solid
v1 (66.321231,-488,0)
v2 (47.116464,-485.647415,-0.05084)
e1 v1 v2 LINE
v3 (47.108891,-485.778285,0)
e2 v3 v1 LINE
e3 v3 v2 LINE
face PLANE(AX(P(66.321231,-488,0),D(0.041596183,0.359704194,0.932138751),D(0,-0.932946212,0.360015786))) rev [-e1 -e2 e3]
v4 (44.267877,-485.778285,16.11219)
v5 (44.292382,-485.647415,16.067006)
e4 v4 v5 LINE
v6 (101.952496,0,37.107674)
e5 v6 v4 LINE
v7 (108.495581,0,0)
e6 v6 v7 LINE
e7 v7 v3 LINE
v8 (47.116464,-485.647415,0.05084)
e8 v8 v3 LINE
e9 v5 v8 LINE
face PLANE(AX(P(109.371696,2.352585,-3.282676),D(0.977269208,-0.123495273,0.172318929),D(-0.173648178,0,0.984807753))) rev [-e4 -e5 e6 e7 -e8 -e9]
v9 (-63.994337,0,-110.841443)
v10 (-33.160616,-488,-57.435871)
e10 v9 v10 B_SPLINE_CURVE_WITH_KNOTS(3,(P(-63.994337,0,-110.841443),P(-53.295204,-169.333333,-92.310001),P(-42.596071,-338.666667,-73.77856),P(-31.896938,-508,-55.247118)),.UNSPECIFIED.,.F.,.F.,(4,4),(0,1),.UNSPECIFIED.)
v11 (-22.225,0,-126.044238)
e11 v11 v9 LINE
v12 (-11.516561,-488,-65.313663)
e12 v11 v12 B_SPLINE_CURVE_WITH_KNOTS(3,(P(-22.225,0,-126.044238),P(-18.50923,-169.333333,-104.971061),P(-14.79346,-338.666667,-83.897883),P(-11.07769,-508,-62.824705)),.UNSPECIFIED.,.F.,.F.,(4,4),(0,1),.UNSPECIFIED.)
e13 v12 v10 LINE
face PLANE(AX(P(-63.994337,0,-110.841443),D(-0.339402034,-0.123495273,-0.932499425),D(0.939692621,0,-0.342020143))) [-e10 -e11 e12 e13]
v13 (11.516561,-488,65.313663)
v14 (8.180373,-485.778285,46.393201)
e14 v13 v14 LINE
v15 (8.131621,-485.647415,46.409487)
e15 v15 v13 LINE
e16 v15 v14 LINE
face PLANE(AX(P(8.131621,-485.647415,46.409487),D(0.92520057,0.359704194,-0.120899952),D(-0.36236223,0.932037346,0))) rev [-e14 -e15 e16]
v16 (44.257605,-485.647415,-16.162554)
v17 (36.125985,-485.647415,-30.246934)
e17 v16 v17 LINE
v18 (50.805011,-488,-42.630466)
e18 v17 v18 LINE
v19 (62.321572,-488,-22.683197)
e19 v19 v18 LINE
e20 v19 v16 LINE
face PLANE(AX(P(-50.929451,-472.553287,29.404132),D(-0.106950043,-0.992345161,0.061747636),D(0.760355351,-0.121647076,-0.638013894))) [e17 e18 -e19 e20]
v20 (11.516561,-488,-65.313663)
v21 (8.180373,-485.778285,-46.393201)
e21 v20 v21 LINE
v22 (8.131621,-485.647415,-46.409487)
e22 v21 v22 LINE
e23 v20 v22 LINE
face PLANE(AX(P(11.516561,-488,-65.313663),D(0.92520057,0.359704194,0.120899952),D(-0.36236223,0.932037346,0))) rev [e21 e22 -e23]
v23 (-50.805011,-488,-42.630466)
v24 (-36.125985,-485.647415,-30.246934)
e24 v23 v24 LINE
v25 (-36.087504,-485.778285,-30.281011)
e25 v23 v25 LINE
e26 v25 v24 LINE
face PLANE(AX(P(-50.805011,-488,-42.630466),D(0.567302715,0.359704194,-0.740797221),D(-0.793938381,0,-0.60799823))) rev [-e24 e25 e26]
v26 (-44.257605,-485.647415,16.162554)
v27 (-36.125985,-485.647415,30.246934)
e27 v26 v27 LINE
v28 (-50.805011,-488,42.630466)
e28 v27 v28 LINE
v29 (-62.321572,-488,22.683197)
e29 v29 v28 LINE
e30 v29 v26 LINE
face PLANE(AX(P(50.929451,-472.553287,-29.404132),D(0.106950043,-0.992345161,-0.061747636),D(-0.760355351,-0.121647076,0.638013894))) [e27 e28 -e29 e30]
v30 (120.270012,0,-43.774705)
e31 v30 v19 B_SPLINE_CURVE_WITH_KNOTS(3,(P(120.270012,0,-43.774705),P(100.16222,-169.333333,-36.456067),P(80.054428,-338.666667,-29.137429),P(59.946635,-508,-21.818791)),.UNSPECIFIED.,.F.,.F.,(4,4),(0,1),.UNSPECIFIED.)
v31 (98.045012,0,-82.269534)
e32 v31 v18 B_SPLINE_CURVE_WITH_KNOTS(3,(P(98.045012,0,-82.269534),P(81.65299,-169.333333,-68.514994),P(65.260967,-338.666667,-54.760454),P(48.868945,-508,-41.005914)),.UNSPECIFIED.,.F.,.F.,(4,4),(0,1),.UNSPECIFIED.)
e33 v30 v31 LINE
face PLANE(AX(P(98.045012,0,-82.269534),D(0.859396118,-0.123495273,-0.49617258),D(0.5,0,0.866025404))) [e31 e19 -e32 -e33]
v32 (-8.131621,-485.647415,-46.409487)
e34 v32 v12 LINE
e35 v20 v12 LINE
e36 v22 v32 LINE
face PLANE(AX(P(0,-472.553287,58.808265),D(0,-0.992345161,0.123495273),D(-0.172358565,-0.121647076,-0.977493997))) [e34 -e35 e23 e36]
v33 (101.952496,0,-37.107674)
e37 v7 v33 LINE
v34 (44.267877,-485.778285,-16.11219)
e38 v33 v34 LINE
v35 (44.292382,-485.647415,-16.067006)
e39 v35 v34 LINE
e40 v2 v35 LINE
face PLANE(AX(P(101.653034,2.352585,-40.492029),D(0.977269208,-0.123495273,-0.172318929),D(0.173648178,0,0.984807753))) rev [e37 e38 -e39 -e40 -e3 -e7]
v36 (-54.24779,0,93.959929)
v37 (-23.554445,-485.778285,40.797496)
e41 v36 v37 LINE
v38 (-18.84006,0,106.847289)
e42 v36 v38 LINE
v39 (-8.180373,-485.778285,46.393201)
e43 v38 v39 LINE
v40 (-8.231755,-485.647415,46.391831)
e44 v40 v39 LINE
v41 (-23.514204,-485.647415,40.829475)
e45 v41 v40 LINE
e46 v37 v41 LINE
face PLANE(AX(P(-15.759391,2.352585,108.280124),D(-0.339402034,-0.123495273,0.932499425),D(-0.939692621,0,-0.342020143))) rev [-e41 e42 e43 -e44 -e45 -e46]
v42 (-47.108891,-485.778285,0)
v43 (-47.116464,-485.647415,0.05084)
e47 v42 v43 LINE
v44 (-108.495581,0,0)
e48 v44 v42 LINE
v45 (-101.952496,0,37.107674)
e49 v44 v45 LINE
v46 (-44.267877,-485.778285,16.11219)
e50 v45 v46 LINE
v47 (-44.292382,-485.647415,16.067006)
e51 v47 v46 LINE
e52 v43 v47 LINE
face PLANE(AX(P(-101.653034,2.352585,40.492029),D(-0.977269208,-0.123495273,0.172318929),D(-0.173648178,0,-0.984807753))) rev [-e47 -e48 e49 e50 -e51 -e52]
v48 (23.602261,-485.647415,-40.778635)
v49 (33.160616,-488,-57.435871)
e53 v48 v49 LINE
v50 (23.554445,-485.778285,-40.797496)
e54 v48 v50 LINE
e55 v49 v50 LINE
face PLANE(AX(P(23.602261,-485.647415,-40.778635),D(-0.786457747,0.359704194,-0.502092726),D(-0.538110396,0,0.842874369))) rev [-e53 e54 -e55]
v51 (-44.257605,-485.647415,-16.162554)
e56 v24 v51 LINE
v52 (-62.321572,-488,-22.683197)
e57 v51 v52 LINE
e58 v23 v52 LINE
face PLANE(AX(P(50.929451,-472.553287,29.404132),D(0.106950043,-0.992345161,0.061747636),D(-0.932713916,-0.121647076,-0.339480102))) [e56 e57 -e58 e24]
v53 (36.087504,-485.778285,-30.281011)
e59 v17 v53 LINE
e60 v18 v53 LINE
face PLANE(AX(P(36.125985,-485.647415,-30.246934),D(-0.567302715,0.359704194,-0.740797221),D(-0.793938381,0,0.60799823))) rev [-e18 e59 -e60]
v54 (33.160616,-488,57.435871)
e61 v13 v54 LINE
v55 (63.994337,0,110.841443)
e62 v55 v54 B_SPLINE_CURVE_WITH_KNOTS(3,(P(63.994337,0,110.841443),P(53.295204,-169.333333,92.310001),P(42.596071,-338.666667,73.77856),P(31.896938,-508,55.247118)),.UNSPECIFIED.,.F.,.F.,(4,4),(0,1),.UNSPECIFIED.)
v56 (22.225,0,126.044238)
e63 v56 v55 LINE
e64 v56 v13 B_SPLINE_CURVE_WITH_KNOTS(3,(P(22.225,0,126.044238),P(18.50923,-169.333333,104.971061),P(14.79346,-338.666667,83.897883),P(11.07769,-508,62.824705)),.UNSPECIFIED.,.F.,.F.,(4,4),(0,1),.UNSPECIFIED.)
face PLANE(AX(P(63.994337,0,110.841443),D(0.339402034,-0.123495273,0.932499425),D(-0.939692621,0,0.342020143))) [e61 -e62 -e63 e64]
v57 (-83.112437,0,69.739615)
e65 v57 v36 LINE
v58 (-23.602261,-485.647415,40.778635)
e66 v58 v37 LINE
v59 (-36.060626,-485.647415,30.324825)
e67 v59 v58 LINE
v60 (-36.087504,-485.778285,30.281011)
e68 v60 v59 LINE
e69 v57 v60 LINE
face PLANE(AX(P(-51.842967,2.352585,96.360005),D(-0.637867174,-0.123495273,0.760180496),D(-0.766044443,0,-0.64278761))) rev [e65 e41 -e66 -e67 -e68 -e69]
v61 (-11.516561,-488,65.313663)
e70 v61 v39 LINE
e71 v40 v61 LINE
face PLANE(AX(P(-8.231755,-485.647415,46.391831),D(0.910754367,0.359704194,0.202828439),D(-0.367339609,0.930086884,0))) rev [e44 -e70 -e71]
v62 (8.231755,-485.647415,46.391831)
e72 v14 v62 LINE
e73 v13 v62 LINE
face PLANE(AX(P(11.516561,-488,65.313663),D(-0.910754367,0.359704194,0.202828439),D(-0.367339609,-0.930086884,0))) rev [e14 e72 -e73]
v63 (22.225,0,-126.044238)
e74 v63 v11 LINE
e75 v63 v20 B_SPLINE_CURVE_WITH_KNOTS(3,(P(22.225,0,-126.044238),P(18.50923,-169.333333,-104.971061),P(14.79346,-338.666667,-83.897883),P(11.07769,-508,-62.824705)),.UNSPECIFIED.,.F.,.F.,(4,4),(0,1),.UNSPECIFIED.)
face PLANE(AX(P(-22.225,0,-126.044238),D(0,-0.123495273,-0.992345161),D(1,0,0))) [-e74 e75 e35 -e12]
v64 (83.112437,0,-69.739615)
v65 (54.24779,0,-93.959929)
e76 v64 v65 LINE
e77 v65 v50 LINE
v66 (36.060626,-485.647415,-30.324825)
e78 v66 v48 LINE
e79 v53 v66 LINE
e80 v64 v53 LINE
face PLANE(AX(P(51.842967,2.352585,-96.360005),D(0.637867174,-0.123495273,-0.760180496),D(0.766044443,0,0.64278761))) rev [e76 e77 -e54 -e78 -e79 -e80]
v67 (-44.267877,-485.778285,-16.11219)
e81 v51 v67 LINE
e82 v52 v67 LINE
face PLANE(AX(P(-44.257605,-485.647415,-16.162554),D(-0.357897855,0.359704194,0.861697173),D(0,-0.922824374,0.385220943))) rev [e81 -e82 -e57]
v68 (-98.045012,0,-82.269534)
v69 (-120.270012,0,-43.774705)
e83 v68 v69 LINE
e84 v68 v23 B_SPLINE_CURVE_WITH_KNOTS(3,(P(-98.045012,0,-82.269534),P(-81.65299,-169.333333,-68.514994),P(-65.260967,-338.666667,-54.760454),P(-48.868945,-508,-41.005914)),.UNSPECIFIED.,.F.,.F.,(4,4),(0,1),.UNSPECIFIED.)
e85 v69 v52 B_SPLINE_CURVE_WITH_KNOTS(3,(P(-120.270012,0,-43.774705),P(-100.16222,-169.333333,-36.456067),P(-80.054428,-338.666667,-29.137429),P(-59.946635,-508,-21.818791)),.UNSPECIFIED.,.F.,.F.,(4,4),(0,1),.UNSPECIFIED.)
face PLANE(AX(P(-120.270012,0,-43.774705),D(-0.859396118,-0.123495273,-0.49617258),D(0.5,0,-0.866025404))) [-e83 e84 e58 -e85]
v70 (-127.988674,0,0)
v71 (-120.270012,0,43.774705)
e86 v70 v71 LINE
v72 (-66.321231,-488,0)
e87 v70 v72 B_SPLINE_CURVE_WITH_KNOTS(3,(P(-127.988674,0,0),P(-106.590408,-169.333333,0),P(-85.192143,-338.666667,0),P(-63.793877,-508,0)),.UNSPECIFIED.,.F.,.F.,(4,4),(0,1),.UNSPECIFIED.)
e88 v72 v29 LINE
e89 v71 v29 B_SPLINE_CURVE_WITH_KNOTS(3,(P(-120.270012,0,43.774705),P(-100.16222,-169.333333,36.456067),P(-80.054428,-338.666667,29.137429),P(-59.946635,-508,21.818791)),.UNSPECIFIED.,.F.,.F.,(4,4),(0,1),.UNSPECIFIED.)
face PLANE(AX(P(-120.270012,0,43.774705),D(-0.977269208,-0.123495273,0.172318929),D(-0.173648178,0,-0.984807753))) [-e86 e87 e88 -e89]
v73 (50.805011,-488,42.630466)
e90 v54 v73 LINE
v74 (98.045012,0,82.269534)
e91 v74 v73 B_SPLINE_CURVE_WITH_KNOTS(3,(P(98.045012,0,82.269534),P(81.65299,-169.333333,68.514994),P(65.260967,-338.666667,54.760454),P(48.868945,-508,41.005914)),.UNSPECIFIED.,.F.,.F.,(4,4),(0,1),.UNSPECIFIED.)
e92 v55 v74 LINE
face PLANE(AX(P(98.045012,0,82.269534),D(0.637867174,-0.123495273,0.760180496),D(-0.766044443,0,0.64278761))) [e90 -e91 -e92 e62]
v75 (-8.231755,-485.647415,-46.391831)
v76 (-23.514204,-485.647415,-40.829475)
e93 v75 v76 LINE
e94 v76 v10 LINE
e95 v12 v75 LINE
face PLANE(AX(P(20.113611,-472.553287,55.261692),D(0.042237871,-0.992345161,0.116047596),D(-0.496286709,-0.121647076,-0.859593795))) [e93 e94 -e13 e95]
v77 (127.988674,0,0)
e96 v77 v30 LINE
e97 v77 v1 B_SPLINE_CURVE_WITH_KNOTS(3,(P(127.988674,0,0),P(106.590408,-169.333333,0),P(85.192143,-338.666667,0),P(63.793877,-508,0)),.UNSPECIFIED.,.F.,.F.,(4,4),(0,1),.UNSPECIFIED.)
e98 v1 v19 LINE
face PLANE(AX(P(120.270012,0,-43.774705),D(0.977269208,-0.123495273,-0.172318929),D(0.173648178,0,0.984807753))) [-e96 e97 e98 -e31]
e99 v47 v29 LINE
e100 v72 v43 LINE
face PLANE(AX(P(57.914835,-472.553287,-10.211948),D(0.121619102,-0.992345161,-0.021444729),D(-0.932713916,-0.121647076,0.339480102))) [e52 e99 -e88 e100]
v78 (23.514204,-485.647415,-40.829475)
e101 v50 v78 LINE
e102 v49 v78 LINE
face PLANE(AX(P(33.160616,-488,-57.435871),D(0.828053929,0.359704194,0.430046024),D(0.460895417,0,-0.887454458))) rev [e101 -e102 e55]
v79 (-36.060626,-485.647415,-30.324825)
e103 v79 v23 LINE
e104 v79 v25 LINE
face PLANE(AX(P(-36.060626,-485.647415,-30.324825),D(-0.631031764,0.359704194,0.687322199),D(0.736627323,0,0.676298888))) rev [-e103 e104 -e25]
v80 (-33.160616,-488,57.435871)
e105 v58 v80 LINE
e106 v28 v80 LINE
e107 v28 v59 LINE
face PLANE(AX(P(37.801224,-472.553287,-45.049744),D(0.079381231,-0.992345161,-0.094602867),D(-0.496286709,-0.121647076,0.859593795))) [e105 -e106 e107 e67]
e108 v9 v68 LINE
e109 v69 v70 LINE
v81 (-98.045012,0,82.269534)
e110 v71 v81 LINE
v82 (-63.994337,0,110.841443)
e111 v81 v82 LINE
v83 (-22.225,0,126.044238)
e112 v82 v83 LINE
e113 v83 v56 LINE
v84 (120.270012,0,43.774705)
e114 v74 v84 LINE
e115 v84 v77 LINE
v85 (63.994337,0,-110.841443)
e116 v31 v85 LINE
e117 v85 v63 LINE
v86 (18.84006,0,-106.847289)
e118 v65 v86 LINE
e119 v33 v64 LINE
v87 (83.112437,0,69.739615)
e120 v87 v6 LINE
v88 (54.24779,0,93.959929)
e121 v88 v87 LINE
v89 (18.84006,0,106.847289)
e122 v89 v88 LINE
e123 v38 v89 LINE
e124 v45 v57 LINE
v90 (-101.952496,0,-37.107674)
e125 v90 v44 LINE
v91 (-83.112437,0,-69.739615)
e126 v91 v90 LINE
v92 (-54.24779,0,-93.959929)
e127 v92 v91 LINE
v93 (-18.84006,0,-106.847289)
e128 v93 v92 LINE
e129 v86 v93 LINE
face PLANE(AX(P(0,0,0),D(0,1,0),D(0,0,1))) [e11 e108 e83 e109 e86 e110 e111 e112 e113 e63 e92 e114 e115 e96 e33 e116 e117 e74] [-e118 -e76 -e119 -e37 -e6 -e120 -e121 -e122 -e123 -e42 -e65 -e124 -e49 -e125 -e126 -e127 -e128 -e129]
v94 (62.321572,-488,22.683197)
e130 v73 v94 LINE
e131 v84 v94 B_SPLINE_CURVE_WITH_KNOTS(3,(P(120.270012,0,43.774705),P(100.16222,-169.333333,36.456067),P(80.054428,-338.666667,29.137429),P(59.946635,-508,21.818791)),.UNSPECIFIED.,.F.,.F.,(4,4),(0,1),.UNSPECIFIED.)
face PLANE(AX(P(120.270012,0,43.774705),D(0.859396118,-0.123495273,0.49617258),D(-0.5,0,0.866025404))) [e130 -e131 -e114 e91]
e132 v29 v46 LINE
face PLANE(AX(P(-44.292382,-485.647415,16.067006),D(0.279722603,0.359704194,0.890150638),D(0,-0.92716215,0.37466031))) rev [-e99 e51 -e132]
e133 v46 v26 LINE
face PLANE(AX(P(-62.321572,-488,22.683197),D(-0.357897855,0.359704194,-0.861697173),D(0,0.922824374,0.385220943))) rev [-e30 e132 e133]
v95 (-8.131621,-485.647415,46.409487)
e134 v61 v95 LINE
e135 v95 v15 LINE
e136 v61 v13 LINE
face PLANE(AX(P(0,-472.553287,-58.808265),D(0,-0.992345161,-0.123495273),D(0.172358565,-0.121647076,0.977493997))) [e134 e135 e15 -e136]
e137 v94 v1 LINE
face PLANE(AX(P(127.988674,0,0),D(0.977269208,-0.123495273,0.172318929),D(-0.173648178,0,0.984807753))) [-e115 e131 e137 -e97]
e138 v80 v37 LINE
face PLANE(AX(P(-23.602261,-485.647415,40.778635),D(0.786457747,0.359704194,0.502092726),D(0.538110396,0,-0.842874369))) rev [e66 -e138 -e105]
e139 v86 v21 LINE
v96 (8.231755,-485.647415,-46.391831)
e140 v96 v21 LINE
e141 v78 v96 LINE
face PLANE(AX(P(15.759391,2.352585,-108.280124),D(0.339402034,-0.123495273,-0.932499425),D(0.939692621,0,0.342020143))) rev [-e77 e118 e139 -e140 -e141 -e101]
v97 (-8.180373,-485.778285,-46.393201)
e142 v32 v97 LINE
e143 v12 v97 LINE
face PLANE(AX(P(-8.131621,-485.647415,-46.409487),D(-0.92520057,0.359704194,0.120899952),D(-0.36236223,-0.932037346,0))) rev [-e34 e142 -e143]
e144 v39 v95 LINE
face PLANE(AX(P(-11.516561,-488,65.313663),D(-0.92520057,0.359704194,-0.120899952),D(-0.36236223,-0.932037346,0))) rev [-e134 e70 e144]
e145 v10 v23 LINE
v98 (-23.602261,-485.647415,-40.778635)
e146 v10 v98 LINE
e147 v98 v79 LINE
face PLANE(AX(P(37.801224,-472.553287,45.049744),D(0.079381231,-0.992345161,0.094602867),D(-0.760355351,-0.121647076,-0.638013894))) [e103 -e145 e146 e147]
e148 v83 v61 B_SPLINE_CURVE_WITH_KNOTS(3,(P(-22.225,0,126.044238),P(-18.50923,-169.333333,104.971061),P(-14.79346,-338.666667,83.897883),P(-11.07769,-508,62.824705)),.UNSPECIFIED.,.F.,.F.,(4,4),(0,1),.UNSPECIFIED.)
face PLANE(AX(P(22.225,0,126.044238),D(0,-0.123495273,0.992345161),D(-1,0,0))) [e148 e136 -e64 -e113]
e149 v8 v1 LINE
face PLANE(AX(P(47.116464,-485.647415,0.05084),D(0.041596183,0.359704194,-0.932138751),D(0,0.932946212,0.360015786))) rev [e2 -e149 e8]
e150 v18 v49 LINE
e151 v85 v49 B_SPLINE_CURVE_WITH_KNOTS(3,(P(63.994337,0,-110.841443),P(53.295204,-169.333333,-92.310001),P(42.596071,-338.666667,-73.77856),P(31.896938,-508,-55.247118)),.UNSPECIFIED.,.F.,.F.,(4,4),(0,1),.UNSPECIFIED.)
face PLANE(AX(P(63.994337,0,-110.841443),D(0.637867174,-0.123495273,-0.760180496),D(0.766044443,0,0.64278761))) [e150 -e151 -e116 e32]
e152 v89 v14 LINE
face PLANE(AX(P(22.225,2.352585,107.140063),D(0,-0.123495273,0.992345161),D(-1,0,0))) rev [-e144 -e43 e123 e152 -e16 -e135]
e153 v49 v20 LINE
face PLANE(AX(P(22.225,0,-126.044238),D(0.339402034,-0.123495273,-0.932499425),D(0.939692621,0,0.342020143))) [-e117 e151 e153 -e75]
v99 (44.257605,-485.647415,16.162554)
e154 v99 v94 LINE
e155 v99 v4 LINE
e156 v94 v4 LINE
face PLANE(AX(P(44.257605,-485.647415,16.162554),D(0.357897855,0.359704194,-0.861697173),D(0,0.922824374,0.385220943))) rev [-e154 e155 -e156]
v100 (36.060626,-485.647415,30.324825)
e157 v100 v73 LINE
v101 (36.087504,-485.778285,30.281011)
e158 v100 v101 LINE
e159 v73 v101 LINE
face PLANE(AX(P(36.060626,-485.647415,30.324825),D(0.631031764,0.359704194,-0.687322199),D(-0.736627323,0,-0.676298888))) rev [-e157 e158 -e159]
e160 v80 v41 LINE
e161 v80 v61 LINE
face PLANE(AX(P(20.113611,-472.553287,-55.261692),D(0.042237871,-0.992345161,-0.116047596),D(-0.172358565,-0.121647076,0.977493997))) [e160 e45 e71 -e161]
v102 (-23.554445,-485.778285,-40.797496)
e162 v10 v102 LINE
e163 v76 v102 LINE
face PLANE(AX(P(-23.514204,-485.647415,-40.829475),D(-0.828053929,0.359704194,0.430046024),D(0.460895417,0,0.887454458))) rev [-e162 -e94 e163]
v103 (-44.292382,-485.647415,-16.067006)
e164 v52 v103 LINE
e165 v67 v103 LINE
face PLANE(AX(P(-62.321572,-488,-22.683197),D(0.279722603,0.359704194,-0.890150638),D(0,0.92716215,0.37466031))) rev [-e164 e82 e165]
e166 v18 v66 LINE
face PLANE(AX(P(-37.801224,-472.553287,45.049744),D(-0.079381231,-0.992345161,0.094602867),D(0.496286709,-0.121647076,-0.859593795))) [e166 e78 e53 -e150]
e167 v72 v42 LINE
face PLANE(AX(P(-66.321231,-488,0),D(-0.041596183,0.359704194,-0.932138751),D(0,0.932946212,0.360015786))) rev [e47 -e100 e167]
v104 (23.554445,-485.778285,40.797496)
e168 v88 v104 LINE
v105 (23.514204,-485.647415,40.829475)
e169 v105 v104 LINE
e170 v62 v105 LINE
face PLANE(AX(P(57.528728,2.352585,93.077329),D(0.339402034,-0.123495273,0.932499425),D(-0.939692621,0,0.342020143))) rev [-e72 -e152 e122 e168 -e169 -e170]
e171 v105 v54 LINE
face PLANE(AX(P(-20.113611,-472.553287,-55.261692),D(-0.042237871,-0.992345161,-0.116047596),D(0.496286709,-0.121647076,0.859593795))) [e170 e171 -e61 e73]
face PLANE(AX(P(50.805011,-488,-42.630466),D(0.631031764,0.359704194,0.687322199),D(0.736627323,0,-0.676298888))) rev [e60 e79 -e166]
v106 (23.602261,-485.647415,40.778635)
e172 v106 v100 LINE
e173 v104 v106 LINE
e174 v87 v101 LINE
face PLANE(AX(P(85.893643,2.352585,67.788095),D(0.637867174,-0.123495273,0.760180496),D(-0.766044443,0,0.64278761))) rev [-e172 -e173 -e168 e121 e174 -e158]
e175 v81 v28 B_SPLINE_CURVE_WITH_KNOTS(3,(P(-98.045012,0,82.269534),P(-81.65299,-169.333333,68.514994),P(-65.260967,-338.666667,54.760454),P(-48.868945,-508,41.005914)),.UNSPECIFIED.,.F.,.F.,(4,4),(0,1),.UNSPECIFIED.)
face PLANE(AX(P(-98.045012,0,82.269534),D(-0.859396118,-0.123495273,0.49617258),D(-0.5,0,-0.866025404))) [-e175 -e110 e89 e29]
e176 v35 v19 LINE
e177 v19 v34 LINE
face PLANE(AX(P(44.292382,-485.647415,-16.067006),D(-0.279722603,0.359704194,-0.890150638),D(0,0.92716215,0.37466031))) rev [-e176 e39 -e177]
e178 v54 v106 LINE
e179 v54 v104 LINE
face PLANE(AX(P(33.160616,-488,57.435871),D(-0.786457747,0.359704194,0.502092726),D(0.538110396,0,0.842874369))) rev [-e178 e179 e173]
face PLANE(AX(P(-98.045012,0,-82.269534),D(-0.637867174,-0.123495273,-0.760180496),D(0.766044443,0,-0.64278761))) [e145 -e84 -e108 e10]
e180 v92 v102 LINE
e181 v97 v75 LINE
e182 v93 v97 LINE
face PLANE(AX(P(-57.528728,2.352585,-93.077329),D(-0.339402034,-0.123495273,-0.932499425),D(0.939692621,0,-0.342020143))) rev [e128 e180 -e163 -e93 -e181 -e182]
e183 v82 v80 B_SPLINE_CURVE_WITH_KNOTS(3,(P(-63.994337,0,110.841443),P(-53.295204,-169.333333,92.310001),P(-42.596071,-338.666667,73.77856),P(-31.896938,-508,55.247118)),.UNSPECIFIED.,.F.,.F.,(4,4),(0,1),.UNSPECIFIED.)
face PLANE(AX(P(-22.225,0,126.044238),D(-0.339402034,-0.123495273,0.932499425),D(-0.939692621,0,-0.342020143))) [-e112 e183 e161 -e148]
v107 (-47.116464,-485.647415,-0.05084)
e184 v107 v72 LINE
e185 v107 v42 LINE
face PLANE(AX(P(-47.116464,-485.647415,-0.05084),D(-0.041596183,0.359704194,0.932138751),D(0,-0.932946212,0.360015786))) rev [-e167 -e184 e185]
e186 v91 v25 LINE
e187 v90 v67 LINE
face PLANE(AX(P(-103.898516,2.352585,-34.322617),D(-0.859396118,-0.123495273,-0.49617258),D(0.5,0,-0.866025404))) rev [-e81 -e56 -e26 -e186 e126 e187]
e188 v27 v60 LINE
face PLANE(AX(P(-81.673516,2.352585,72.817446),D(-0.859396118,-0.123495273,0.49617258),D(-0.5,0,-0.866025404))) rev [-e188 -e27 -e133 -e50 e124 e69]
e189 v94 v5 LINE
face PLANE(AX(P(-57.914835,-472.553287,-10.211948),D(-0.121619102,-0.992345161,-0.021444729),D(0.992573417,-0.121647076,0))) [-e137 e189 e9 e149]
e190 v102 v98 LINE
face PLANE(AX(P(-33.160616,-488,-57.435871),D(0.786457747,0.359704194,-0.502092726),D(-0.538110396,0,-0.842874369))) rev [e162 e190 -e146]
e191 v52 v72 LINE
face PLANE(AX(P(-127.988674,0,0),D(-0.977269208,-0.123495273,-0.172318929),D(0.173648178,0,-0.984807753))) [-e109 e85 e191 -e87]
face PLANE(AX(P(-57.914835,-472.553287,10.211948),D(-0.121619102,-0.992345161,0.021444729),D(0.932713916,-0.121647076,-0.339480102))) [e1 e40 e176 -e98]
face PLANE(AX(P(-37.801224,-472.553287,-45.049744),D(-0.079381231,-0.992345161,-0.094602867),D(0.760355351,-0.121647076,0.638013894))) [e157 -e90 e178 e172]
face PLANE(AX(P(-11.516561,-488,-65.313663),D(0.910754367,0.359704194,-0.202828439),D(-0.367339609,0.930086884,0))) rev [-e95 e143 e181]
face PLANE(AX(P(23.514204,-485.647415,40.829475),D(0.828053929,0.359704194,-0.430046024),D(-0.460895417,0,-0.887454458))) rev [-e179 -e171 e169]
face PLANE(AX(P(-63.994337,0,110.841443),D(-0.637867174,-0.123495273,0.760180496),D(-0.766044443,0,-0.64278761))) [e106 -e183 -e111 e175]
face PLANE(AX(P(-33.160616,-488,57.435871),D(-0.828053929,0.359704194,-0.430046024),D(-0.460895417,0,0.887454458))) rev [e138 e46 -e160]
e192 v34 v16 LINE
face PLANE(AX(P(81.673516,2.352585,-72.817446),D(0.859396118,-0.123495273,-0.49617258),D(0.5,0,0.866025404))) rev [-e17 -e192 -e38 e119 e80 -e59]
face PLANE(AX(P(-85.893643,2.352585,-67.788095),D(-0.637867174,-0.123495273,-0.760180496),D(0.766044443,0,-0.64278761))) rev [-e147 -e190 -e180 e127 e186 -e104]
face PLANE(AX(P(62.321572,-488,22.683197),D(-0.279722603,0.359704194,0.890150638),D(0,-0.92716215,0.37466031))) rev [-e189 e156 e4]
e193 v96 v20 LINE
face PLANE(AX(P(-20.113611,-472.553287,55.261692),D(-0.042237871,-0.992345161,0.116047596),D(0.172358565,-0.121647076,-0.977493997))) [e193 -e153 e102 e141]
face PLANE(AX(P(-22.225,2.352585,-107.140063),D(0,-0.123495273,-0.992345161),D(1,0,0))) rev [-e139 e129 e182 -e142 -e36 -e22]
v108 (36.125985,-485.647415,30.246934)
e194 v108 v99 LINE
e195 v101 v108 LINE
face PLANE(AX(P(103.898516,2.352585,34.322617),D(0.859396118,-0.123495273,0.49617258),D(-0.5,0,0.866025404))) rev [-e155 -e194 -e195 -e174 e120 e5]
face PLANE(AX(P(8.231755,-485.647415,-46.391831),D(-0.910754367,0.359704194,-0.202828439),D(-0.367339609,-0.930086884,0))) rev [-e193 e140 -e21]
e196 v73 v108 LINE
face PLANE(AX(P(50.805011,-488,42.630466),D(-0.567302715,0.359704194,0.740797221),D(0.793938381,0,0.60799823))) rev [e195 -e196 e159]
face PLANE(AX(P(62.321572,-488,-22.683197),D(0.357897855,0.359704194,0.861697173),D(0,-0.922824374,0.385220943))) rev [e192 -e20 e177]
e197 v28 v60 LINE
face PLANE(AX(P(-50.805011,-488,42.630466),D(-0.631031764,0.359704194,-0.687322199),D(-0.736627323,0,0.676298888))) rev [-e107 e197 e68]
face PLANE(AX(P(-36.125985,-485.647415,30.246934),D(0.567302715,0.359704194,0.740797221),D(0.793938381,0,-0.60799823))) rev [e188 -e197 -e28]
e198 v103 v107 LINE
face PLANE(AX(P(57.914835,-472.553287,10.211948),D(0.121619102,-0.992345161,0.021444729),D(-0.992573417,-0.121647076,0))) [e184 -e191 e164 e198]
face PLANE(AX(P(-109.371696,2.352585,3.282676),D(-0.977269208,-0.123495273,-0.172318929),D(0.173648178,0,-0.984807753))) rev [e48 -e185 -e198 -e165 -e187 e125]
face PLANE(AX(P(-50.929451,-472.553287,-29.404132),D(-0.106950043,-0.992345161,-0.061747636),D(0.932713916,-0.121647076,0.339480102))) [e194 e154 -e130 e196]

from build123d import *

# Parameters (mm, degrees)
LOFT1_DEPTH        = 508
LOFT1_TAPER        = -7.093868
SHELL1_T           = -19.05
SKETCH5_R          = 147.867108762
CUT_EXTRUDE1_DEPTH = 20
CUT_EXTRUDE2_DEPTH = 526.768458633
CUT_EXTRUDE2_TAPER = -20
CIRPATTERN1_COUNT  = 18


# Read off the part's stored shape, not the designer's step: Loft1
with BuildPart() as part:
    # Loft1 outline → Loft1 (new body)
    with BuildSketch(Plane(origin=(0, -508, 0), x_dir=(1, 0, 0), z_dir=(0, 1, 0))):
        Polygon((31.896938478, -55.24711805), (48.868944947, -41.005913681), (59.946635427, -21.81879094), (63.793876956, 0), (59.946635427, 21.81879094), (48.868944947, 41.005913681), (31.896938478, 55.24711805), (11.07769048, 62.824704621), (-11.07769048, 62.824704621), (-31.896938478, 55.24711805), (-48.868944947, 41.005913681), (-59.946635427, 21.81879094), (-63.793876956, 0), (-59.946635427, -21.81879094), (-48.868944947, -41.005913681), (-31.896938478, -55.24711805), (-11.07769048, -62.824704621), (11.07769048, -62.824704621), align=None)
    extrude(amount=LOFT1_DEPTH, taper=LOFT1_TAPER)

    # Shell1
    shell1_openings = [part.faces().sort_by_distance(p)[0] for p in [
        (0, 0, 0),
    ]]
    offset(amount=SHELL1_T, openings=shell1_openings, kind=Kind.INTERSECTION)

    # Sketch5 → Cut-Extrude1 (cut)
    with BuildSketch(Plane.XZ.offset(508)):
        Circle(SKETCH5_R)
    extrude(amount=-CUT_EXTRUDE1_DEPTH, mode=Mode.SUBTRACT)

    # Sketch6 → Cut-Extrude2 (cut, through all)
    with BuildSketch(Plane(origin=(-57.914835054, -472.553286642, -10.211948003), x_dir=(0.173648177666931, 0, -0.984807753012208), z_dir=(-0.12161910183404463, -0.9923451605496023, -0.021444729022872505))):
        Polygon((-11.516560933, 125.079390032), (-8.131620777, 106.029390032), (8.131620777, 106.029390032), (11.516560933, 125.079390032), align=None)
    cut_extrude2 = extrude(amount=CUT_EXTRUDE2_DEPTH, taper=CUT_EXTRUDE2_TAPER, mode=Mode.SUBTRACT)

    # CirPattern1: Cut-Extrude2 ×18 about axis
    cirpattern1_axis = Axis((0, 0, 0), (0, 1, 0))
    for i in range(1, CIRPATTERN1_COUNT):
        add(cut_extrude2.rotate(cirpattern1_axis, i * 360 / CIRPATTERN1_COUNT), mode=Mode.SUBTRACT)


solid = part.part
